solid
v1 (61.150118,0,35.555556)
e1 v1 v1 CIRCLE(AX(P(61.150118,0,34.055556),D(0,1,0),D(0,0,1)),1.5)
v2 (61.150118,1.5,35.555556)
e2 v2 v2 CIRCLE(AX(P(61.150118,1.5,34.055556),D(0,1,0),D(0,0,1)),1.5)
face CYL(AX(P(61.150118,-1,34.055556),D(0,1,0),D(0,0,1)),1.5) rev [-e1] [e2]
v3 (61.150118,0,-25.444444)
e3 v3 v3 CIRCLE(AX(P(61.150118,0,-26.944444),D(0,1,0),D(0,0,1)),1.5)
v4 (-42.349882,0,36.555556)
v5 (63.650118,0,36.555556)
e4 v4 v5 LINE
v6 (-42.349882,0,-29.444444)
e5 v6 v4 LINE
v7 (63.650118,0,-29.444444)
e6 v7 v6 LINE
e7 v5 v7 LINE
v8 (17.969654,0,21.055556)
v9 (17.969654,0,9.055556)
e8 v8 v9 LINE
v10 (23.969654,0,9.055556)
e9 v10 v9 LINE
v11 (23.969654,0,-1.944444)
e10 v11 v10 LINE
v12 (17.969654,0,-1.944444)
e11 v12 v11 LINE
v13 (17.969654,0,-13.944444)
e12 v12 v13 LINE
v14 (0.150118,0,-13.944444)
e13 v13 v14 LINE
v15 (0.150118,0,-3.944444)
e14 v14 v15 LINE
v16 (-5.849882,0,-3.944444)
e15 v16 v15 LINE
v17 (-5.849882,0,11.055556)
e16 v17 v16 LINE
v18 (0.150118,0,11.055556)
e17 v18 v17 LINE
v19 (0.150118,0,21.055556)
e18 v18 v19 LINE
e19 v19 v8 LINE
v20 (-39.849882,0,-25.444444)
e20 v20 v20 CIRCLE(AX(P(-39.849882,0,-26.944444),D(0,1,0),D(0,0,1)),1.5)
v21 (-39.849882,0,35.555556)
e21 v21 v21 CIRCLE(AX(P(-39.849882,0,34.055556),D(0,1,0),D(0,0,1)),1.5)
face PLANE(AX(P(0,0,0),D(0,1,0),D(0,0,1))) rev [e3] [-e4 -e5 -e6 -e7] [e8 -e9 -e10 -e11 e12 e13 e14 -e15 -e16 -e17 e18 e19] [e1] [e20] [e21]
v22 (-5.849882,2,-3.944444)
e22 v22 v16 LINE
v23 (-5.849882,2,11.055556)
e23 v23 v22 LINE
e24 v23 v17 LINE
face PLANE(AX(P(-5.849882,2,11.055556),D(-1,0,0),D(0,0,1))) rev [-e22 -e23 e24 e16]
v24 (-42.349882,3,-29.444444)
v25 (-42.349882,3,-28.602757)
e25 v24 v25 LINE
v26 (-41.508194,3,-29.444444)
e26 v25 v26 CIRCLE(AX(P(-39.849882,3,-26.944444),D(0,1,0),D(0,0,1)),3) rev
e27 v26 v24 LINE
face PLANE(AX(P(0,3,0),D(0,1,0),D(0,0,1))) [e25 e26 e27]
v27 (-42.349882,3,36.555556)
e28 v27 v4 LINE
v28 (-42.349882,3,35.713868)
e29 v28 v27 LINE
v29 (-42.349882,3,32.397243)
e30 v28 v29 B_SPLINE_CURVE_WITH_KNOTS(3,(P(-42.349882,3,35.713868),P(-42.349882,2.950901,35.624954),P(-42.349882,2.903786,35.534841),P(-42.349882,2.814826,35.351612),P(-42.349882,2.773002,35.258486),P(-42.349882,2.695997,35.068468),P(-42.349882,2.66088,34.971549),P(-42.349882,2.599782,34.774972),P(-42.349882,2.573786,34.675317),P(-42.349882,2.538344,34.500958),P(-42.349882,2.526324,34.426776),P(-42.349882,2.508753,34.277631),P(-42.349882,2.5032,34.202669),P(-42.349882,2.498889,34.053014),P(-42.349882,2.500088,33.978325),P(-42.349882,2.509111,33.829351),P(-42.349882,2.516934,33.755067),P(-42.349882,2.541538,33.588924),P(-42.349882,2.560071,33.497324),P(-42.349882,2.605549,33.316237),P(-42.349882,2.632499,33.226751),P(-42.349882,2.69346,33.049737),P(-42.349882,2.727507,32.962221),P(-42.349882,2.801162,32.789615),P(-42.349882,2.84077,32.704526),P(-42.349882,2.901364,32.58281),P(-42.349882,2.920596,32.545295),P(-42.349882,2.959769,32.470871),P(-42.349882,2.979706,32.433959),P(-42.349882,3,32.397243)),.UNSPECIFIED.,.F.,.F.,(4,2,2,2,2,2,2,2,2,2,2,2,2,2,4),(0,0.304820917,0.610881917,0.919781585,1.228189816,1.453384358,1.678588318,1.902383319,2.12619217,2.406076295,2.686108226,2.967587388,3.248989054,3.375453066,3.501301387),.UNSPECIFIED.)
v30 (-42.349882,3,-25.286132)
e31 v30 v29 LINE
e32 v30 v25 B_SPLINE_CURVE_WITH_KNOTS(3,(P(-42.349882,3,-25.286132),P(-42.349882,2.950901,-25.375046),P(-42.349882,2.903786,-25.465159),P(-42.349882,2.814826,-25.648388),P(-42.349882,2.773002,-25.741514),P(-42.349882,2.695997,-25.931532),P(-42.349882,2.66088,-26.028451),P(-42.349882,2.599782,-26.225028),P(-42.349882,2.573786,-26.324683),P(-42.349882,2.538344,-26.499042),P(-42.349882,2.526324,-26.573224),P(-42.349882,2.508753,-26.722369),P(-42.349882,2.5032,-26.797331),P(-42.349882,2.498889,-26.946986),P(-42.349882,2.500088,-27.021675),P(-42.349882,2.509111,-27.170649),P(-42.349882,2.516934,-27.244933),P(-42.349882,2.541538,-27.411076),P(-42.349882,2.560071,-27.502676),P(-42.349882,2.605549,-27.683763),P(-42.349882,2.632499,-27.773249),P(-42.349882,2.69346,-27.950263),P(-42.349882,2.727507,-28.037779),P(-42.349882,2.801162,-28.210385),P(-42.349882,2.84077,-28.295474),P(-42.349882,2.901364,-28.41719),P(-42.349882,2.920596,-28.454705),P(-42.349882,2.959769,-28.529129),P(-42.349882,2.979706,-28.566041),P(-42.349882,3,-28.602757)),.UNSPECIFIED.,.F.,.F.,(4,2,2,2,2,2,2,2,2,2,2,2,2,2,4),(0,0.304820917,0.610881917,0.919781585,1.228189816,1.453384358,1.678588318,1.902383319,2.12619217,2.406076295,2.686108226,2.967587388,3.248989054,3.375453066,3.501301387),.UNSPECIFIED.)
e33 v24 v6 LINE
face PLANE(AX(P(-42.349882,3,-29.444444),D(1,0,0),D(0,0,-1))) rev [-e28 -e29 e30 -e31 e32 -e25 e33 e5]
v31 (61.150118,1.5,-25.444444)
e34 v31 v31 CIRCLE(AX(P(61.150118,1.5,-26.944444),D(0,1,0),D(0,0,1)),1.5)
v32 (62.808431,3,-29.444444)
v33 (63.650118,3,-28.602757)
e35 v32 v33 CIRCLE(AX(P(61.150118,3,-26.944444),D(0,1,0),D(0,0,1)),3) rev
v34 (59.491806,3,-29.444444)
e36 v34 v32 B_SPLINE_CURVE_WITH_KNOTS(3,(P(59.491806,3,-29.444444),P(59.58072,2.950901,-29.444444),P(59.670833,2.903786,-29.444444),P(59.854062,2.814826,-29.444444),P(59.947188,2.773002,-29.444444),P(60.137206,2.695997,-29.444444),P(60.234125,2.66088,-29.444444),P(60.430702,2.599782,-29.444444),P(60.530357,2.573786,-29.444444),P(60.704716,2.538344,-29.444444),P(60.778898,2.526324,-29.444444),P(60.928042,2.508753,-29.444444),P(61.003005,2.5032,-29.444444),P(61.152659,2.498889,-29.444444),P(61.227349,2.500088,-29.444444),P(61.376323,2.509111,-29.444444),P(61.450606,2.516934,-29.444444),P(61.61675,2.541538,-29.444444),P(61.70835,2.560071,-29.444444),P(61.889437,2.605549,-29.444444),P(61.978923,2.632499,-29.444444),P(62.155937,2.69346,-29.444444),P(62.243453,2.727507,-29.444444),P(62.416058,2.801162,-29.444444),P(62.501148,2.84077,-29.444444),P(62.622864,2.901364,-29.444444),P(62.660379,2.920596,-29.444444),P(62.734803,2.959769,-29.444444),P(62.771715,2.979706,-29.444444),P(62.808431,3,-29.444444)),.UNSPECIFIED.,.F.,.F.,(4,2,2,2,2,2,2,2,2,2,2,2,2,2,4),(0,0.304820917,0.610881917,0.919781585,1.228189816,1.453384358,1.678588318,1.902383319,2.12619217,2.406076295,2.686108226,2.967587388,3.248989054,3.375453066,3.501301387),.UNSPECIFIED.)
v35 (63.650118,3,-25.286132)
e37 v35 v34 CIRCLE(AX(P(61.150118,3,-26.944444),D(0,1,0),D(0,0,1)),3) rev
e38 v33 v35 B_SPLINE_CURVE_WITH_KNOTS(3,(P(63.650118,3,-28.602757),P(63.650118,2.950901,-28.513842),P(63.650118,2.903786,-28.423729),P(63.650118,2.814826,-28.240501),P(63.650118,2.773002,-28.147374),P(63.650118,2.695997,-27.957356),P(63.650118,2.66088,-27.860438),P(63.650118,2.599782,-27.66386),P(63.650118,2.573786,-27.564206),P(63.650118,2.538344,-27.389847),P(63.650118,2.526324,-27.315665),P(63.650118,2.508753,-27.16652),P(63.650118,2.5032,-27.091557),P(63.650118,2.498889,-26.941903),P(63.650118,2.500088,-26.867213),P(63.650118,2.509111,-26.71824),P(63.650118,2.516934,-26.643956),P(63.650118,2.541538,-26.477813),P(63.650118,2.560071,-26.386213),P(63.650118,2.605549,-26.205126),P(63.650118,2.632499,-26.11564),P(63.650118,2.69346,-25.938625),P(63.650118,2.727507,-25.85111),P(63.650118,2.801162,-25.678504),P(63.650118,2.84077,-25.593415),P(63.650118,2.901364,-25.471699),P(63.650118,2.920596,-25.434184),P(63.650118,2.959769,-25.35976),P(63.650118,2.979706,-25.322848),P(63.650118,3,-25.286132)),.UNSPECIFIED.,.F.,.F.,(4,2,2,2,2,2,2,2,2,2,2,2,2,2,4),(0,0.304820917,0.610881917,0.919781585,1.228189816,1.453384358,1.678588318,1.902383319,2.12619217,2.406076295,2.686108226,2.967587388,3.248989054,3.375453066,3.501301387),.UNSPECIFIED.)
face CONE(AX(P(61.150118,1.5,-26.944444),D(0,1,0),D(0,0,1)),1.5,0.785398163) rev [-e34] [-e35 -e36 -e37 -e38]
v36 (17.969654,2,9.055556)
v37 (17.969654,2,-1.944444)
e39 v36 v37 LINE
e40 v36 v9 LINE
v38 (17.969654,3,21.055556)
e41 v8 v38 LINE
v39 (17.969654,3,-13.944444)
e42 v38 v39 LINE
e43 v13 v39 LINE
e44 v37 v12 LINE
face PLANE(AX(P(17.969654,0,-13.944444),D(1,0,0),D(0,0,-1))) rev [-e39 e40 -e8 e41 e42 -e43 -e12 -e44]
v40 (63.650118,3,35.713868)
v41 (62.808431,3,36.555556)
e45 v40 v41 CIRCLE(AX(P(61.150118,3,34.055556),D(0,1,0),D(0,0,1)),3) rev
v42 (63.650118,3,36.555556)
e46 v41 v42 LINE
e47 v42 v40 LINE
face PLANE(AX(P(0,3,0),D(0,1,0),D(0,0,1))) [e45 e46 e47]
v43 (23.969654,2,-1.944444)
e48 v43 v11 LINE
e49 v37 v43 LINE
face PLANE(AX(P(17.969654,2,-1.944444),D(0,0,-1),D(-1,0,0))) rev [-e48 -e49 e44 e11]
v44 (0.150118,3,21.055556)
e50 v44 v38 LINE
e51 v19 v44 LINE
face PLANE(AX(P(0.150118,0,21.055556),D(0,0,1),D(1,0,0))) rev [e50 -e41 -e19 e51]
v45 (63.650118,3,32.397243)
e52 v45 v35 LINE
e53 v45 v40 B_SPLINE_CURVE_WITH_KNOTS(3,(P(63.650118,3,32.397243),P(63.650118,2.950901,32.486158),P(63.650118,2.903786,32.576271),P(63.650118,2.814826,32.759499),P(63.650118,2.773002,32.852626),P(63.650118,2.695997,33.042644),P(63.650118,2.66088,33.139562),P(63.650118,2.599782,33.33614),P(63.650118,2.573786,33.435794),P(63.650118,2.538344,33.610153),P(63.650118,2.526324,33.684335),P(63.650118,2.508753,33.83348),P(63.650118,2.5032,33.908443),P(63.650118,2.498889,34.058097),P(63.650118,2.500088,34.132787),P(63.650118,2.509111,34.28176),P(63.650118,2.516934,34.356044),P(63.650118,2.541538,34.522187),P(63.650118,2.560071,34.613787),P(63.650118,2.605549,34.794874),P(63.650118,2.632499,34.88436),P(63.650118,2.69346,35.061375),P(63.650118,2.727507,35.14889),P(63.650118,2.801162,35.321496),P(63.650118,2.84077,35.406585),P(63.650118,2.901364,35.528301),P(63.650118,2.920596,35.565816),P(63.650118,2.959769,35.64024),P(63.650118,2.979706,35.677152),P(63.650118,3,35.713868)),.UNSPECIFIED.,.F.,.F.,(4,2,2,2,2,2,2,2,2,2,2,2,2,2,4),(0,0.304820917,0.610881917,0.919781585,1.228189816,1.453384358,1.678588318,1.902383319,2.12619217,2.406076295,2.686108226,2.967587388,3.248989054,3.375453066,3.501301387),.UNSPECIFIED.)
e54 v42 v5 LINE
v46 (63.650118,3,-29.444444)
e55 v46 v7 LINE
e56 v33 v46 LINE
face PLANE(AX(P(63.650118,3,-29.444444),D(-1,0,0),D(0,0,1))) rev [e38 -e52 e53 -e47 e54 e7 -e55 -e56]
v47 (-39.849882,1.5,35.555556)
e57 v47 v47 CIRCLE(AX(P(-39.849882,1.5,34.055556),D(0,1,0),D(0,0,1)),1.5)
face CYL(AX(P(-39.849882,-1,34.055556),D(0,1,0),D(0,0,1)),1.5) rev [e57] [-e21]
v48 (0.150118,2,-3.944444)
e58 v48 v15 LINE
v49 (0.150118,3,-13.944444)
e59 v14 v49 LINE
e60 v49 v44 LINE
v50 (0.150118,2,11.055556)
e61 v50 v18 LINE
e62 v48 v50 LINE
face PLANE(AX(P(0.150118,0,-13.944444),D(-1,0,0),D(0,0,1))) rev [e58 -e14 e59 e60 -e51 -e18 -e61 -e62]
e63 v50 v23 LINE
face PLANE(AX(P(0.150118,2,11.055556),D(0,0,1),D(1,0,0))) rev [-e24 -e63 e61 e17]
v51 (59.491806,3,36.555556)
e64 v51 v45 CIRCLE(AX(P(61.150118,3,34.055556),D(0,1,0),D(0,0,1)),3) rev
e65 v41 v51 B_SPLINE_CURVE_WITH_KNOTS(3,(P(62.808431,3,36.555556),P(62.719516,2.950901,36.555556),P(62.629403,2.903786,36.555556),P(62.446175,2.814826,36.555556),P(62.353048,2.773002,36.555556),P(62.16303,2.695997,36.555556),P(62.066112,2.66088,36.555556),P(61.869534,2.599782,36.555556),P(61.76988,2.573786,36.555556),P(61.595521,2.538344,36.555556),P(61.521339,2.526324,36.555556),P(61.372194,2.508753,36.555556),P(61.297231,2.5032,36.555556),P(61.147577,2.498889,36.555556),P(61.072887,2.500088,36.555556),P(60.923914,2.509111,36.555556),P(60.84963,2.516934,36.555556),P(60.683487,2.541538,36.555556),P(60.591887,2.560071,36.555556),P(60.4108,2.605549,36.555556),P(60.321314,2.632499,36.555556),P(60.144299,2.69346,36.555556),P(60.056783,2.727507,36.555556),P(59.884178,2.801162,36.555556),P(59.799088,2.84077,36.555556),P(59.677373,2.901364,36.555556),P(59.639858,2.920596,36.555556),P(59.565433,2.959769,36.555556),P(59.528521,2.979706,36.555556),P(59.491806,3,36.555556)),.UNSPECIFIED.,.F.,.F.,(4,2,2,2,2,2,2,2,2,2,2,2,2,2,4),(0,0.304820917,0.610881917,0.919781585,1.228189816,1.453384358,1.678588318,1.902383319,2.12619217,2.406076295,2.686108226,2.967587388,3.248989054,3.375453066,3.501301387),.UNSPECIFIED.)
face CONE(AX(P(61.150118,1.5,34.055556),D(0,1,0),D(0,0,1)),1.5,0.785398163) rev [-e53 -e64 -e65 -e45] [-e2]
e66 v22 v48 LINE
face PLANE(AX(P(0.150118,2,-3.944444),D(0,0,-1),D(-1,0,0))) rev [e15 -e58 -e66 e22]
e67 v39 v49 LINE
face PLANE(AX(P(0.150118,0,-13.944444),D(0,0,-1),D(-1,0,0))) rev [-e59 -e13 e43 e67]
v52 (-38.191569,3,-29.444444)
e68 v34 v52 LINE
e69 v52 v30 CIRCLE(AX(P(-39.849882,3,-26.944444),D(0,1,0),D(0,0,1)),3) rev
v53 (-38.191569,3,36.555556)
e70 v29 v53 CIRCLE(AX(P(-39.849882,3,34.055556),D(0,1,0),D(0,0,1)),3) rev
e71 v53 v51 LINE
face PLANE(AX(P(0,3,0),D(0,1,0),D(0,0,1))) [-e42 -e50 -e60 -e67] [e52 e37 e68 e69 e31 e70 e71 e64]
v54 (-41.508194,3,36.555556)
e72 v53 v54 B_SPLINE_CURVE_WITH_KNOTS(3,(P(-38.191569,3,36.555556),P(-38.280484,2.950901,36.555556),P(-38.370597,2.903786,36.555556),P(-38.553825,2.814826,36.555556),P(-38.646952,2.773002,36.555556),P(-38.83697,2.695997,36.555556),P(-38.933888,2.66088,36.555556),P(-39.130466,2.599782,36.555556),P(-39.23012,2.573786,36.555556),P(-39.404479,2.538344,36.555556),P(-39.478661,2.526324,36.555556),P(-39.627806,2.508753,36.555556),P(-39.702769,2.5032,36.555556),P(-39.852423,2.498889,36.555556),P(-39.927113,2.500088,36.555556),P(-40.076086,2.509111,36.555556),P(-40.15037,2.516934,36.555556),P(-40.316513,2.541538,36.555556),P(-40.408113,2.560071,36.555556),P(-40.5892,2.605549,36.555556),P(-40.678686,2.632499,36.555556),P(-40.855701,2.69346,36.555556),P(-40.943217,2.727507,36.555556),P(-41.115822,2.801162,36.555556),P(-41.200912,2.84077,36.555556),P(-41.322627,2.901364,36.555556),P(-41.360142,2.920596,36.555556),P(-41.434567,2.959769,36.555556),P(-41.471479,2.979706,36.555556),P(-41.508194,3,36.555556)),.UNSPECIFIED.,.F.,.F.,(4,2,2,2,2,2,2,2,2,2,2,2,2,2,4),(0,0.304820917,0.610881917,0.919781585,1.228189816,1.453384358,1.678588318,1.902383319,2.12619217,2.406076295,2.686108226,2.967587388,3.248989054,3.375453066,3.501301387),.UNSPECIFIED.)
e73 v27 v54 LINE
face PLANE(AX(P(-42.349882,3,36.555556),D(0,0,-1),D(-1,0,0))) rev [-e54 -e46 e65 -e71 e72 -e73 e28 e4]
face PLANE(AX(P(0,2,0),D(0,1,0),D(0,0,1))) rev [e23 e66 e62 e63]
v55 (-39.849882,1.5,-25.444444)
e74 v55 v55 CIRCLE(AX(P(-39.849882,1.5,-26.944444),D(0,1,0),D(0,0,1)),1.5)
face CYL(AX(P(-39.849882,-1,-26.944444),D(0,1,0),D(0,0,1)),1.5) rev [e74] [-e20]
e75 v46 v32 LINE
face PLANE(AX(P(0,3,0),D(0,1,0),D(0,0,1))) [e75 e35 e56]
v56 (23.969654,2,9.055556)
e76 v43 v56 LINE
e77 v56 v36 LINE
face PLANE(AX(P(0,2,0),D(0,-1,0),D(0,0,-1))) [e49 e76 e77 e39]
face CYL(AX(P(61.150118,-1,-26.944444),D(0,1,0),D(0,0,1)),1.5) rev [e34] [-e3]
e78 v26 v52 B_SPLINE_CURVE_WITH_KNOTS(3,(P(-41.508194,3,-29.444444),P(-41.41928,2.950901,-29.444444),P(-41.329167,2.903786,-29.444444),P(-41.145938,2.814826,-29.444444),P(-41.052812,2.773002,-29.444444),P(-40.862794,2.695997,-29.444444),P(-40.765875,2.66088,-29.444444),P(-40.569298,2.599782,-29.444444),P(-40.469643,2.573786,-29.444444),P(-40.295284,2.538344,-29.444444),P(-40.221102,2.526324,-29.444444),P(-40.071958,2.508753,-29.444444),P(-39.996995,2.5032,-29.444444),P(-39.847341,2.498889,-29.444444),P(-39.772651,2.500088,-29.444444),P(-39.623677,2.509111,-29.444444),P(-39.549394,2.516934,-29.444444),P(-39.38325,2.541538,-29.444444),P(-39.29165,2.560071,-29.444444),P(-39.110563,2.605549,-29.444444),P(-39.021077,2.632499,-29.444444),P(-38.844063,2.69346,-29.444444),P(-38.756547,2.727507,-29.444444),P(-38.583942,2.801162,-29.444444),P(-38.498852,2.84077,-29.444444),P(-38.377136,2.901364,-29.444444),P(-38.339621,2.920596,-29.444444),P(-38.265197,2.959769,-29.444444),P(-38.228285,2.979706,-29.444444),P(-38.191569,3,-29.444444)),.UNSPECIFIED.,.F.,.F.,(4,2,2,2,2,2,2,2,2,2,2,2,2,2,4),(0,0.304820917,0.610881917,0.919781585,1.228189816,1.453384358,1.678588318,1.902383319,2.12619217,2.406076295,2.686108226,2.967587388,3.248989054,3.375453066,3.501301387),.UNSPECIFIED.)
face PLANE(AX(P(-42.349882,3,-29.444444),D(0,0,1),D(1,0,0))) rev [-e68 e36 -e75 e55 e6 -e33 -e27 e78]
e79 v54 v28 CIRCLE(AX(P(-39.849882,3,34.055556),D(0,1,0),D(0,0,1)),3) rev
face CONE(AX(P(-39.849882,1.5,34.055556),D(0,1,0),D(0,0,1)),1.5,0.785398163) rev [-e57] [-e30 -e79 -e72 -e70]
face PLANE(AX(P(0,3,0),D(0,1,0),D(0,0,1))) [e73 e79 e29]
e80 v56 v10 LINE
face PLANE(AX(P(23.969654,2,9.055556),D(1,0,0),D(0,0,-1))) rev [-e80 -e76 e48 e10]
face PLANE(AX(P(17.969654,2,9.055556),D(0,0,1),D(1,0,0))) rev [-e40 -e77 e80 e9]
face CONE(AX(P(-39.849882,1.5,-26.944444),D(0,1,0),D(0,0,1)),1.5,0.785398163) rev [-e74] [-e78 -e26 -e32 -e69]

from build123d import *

# Parameters (mm, degrees)
CROQUIS1_W              = 106
CROQUIS1_H              = 66
SALIENTE_EXTRUIR1_DEPTH = 3
CROQUIS2_W              = 17.819535579
CROQUIS2_H              = 35
CORTAR_EXTRUIR1_DEPTH   = 3
CROQUIS3_W              = 6
CROQUIS3_H              = 11
CROQUIS3_H_2            = 15
CORTAR_EXTRUIR2_DEPTH   = 2
CROQUIS4_R              = 1.5
CORTAR_EXTRUIR3_DEPTH   = 4
CHAFL_N1_SIZE           = 1.5


with BuildPart() as part:
    # Croquis1 → Saliente-Extruir1 (new body)
    with BuildSketch(Plane(origin=(0, 0, 0), x_dir=(1, 0, 0), z_dir=(0, 1, 0))):
        with Locations((10.650118203, -3.555555556)):
            Rectangle(CROQUIS1_W, CROQUIS1_H)
    extrude(amount=SALIENTE_EXTRUIR1_DEPTH)

    # Croquis2 → Cortar-Extruir1 (cut)
    with BuildSketch(Plane(origin=(0, 3, 0), x_dir=(1, 0, 0), z_dir=(0, 1, 0))):
        with Locations((9.059885993, -3.555555556)):
            Rectangle(CROQUIS2_W, CROQUIS2_H)
    extrude(amount=-CORTAR_EXTRUIR1_DEPTH, mode=Mode.SUBTRACT)

    # Croquis3 → Cortar-Extruir2 (cut)
    with BuildSketch(Plane.XZ):
        with Locations((20.969653782, 3.555555556)):
            Rectangle(CROQUIS3_W, CROQUIS3_H)
        with Locations((-2.849881797, 3.555555556)):
            Rectangle(CROQUIS3_W, CROQUIS3_H_2)
    extrude(amount=-CORTAR_EXTRUIR2_DEPTH, mode=Mode.SUBTRACT)

    # Croquis4 → Cortar-Extruir3 (cut)
    with BuildSketch(Plane(origin=(0, 3, 0), x_dir=(1, 0, 0), z_dir=(0, 1, 0))):
        with Locations(Location((-39.849881797, 26.944444444, 0), (0, 0, 270))):
            Circle(CROQUIS4_R)
        with Locations(Location((61.150118203, 26.944444444, 0), (0, 0, 270))):
            Circle(CROQUIS4_R)
        with Locations(Location((61.150118203, -34.055555556, 0), (0, 0, 270))):
            Circle(CROQUIS4_R)
        with Locations(Location((-39.849881797, -34.055555556, 0), (0, 0, 270))):
            Circle(CROQUIS4_R)
    extrude(amount=-CORTAR_EXTRUIR3_DEPTH, mode=Mode.SUBTRACT)

    # Chaflán1
    # the kernel refuses this chamfer: 1.5 mm, written as the material it takes off along each edge
    with BuildSketch(Plane(origin=(-39.849881797, 3, 34.055555556), x_dir=(0, 0, 1), z_dir=(-1, 0, 0))) as chafl_n1_piece_1:
        Polygon((1.5 + CHAFL_N1_SIZE, 0), (1.5, -CHAFL_N1_SIZE), (1.5, 0), align=None)
    revolve(axis=Axis((-39.849881797, 3, 34.055555556), (0, 1, 0)), mode=Mode.SUBTRACT)
    with BuildSketch(Plane(origin=(61.150118203, 3, 34.055555556), x_dir=(0, 0, 1), z_dir=(-1, 0, 0))) as chafl_n1_piece_2:
        Polygon((1.5 + CHAFL_N1_SIZE, 0), (1.5, -CHAFL_N1_SIZE), (1.5, 0), align=None)
    revolve(axis=Axis((61.150118203, 3, 34.055555556), (0, 1, 0)), mode=Mode.SUBTRACT)
    with BuildSketch(Plane(origin=(61.150118203, 3, -26.944444444), x_dir=(0, 0, 1), z_dir=(-1, 0, 0))) as chafl_n1_piece_3:
        Polygon((1.5 + CHAFL_N1_SIZE, 0), (1.5, -CHAFL_N1_SIZE), (1.5, 0), align=None)
    revolve(axis=Axis((61.150118203, 3, -26.944444444), (0, 1, 0)), mode=Mode.SUBTRACT)
    with BuildSketch(Plane(origin=(-39.849881797, 3, -26.944444444), x_dir=(0, 0, 1), z_dir=(-1, 0, 0))) as chafl_n1_piece_4:
        Polygon((1.5 + CHAFL_N1_SIZE, 0), (1.5, -CHAFL_N1_SIZE), (1.5, 0), align=None)
    revolve(axis=Axis((-39.849881797, 3, -26.944444444), (0, 1, 0)), mode=Mode.SUBTRACT)


solid = part.part
